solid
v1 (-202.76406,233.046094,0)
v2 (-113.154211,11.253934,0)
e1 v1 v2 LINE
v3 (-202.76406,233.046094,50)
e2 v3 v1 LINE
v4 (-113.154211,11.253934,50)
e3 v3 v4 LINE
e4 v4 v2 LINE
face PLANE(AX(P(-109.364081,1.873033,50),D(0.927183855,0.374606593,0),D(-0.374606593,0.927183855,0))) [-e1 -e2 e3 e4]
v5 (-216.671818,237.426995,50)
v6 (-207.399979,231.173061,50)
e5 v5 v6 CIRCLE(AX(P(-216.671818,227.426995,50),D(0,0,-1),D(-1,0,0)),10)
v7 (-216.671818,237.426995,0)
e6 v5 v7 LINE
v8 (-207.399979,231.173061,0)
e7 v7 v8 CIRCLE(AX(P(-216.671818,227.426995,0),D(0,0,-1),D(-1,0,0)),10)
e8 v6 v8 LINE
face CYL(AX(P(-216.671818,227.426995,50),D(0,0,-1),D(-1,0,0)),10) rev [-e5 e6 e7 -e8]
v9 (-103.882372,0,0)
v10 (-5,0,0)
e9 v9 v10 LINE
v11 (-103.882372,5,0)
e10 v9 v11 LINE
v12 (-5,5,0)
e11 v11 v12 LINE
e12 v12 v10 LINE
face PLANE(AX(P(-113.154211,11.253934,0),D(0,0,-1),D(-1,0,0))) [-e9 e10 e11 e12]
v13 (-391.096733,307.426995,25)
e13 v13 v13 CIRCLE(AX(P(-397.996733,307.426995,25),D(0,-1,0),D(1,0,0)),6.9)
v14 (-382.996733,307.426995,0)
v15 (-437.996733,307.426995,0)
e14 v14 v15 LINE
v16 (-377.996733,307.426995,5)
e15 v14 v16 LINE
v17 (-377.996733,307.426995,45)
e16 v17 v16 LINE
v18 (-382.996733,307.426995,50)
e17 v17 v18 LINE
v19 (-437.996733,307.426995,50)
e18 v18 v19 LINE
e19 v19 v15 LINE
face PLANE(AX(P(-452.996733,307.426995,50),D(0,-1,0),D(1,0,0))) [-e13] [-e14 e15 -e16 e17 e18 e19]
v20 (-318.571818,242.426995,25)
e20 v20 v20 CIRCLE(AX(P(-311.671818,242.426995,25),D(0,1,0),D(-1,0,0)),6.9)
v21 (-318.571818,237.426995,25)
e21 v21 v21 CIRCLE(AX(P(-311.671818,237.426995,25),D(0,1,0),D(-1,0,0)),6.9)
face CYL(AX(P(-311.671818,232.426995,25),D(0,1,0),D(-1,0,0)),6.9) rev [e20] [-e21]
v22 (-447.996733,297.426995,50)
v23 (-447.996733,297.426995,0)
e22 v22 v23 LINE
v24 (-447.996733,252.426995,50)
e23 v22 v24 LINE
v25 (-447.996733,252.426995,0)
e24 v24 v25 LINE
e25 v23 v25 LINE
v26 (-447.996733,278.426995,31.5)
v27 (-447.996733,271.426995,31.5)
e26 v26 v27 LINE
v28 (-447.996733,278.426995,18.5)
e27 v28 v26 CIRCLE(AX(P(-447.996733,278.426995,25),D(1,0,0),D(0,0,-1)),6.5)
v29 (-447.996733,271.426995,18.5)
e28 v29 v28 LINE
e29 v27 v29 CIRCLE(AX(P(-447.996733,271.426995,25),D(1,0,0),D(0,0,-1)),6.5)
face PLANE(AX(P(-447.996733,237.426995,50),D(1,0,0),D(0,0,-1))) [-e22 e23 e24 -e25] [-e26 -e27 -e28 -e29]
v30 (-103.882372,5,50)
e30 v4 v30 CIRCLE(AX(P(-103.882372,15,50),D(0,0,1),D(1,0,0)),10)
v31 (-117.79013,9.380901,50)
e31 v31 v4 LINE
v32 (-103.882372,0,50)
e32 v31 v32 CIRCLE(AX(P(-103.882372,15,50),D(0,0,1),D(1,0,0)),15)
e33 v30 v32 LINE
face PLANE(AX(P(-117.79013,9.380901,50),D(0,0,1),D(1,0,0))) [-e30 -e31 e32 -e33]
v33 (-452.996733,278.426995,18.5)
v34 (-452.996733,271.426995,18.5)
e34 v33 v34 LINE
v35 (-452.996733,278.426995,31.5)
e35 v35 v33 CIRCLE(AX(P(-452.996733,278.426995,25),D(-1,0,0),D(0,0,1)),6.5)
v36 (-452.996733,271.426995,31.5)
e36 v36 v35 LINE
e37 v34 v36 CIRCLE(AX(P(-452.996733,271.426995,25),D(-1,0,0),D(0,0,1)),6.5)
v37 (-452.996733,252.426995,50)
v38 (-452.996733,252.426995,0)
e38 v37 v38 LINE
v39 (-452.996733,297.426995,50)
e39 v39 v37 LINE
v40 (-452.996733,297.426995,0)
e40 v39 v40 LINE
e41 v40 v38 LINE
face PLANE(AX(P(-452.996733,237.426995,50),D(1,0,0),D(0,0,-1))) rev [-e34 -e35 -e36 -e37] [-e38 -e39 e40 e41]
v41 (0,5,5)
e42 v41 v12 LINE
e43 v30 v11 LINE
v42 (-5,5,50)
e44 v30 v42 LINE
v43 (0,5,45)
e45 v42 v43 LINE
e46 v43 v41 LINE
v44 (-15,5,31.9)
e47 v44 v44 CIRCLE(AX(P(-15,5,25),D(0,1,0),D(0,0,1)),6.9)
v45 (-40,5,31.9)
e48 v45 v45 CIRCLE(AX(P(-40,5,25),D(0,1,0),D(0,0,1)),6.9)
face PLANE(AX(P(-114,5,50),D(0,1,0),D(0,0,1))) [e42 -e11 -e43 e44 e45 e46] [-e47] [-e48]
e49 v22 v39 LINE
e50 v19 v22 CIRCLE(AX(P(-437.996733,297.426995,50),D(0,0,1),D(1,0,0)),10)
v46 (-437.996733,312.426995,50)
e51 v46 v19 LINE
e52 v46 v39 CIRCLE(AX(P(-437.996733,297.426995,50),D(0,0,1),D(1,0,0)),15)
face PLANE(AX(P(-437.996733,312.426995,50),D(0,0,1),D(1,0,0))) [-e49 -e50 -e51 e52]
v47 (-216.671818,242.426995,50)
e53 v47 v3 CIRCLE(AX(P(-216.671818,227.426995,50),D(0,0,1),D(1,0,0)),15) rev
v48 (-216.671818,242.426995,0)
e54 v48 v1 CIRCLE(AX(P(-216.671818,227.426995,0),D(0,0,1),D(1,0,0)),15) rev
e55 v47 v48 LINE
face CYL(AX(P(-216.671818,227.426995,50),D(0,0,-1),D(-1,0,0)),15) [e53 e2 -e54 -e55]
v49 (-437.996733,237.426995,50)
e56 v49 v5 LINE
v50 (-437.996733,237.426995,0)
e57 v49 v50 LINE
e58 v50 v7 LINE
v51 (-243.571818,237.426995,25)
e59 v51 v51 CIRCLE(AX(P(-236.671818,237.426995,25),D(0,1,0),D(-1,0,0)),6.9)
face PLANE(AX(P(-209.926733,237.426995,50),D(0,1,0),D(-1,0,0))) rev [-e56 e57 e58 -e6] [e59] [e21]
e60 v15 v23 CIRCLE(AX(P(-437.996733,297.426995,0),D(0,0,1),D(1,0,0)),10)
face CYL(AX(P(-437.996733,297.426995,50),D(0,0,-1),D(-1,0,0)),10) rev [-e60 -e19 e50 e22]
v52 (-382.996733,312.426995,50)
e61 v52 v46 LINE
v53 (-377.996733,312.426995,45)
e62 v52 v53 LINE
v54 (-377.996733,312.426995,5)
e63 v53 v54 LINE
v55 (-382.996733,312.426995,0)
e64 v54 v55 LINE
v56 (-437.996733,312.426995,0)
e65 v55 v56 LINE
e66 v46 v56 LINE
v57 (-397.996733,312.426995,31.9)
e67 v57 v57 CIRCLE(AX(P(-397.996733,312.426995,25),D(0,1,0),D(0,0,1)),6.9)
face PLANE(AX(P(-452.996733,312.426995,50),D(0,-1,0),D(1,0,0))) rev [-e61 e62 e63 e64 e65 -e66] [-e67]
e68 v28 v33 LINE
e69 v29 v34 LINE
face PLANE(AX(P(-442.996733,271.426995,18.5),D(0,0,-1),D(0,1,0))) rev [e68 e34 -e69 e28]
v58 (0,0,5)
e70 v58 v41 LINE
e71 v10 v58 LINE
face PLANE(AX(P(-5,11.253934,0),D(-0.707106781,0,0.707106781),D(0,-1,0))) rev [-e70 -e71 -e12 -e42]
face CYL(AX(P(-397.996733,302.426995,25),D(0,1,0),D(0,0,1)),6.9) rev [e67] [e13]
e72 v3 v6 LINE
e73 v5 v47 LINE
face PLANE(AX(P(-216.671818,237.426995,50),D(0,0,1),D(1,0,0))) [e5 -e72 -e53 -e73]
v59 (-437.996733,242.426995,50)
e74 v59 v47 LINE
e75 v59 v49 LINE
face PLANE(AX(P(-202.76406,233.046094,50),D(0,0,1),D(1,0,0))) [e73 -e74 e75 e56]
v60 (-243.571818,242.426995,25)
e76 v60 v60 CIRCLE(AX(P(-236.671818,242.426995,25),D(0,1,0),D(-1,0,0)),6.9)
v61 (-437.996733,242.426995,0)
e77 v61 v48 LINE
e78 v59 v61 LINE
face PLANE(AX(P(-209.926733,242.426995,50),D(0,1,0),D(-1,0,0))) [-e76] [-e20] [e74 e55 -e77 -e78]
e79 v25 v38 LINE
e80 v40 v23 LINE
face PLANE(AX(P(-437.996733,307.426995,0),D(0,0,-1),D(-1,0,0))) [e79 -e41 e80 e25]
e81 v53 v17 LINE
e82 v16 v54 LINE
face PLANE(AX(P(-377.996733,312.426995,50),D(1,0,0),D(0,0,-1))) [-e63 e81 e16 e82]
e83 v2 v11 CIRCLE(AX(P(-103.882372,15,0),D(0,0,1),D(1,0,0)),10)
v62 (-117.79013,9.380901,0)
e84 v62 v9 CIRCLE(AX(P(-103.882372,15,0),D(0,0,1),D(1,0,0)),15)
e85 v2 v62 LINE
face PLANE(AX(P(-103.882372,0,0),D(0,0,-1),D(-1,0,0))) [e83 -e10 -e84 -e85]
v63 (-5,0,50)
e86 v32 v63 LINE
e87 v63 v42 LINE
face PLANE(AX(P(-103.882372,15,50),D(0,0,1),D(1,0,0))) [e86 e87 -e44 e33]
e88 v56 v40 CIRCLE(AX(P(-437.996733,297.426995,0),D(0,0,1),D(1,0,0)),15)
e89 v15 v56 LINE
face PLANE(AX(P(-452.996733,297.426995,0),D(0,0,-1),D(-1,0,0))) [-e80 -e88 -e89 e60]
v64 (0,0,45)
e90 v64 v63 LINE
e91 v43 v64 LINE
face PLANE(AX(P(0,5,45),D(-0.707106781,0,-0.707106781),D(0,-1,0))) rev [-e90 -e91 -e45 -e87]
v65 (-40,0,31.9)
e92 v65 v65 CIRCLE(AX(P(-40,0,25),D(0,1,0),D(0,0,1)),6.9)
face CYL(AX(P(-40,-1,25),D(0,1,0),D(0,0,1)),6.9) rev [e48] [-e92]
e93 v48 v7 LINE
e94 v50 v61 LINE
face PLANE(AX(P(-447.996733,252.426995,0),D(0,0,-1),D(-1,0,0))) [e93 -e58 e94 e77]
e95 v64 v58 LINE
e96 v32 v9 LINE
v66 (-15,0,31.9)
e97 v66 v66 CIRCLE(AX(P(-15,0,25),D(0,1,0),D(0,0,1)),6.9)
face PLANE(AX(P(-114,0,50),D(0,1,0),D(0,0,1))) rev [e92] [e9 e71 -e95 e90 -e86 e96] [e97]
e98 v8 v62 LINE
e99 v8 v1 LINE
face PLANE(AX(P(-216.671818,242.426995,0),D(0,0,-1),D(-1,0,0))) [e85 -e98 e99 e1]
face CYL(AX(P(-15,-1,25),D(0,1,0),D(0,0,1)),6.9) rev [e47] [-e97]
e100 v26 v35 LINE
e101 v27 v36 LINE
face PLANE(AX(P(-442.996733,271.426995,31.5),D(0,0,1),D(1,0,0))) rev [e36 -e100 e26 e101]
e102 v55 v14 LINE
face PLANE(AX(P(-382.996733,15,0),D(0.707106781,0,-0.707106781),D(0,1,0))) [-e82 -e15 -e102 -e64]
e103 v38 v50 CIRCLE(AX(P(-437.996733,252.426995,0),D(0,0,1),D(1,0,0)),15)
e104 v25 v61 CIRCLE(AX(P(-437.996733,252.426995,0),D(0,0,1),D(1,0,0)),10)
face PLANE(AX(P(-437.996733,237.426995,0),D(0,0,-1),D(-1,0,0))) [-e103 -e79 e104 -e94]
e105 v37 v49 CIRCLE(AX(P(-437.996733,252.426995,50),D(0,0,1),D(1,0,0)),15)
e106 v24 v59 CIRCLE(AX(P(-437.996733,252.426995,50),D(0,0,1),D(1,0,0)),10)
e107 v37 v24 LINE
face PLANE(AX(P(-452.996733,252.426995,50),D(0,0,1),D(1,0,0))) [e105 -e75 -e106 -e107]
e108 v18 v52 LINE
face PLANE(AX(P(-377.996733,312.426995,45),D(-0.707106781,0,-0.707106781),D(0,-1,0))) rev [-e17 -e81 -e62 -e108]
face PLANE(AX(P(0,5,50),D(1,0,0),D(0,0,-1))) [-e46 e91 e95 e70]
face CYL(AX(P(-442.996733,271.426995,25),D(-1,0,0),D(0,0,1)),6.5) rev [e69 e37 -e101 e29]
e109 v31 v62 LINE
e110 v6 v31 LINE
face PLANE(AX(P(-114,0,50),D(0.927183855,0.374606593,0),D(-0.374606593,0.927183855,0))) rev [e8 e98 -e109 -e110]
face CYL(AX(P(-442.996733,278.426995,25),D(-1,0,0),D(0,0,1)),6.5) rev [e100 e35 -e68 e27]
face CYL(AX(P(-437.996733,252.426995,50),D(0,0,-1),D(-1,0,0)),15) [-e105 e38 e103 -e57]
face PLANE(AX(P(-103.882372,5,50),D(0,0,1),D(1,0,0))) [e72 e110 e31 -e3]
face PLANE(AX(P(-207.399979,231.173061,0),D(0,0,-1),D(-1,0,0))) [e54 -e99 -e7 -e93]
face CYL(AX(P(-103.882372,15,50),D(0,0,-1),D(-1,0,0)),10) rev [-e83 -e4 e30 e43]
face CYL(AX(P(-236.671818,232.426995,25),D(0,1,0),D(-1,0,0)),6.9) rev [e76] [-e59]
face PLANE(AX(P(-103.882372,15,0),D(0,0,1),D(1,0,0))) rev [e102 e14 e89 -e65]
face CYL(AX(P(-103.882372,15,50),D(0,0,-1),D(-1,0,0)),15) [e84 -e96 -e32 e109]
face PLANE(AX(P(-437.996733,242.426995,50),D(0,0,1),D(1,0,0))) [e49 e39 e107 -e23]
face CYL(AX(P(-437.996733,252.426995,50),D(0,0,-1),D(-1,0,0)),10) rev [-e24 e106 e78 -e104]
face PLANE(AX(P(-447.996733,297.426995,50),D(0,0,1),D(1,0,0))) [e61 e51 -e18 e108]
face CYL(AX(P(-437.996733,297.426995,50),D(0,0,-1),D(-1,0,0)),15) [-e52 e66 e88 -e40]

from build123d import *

# Parameters (mm, degrees)
SM_BASE_FLANGE_1_DEPTH = 50
SKETCH_3_R             = 6.9
CUT_EXTRUDE_2_DEPTH    = 10
OTHER_1_DEPTH          = 5
OTHER_START            = 307.42699492
OTHER_1_2_DEPTH        = 5
CUT_EXTRUDE_3_DEPTH    = 10
SKETCH_5_R             = 6.9
CUT_EXTRUDE_4_DEPTH    = 10
SKETCH_6_R             = 6.9
CUT_EXTRUDE_5_DEPTH    = 10


# Read off the part's stored shape, not the designer's step: Затупленный угол1
# Sheet-metal steps are written as plain solids
with BuildPart() as part:
    # Sketch 1 → Базовая кромка1 (new body)
    with BuildSketch(Plane.XY):
        with BuildLine():
            Line((-377.996732669, 312.42699492), (-437.996732669, 312.42699492))
            ThreePointArc((-437.996732669, 312.42699492), (-448.603334387, 308.033596638), (-452.996732669, 297.42699492))
            Line((-452.996732669, 297.42699492), (-452.996732669, 252.42699492))
            ThreePointArc((-452.996732669, 252.42699492), (-448.603334387, 241.820393202), (-437.996732669, 237.42699492))
            Line((-437.996732669, 237.42699492), (-216.671817837, 237.42699492))
            ThreePointArc((-216.671817837, 237.42699492), (-211.079888803, 235.717370646), (-207.399979292, 231.173060854))
            Line((-207.399979292, 231.173060854), (-117.790130066, 9.380901099))
            ThreePointArc((-117.790130066, 9.380901099), (-112.270265799, 2.564436412), (-103.882372247, 0))
            Line((-103.882372247, 0), (0, 0))
            Line((0, 0), (0, 5))
            Line((0, 5), (-103.882372247, 5))
            ThreePointArc((-103.882372247, 5), (-109.474301282, 6.709624274), (-113.154210793, 11.253934066))
            Line((-113.154210793, 11.253934066), (-202.764060019, 233.046093821))
            ThreePointArc((-202.764060019, 233.046093821), (-208.283924285, 239.862558508), (-216.671817837, 242.42699492))
            Line((-216.671817837, 242.42699492), (-437.996732669, 242.42699492))
            ThreePointArc((-437.996732669, 242.42699492), (-445.067800481, 245.355927108), (-447.996732669, 252.42699492))
            Line((-447.996732669, 252.42699492), (-447.996732669, 297.42699492))
            ThreePointArc((-447.996732669, 297.42699492), (-445.067800481, 304.498062732), (-437.996732669, 307.42699492))
            Line((-437.996732669, 307.42699492), (-377.996732669, 307.42699492))
            Line((-377.996732669, 307.42699492), (-377.996732669, 312.42699492))
        make_face()
    extrude(amount=SM_BASE_FLANGE_1_DEPTH)

    # Эскиз3 → Вырез-Вытянуть2 (cut)
    with BuildSketch(Plane(origin=(0, 5, 0), x_dir=(1, 0, 0), z_dir=(0, 1, 0))):
        with Locations(Location((-15, -25, 0), (0, 0, 270))):
            Circle(SKETCH_3_R)
        with Locations(Location((-40, -25, 0), (0, 0, 270))):
            Circle(SKETCH_3_R)
    extrude(amount=-CUT_EXTRUDE_2_DEPTH, mode=Mode.SUBTRACT)

    # Other 1 outline → Other 1 (cut)
    with BuildSketch(Plane(origin=(0, 0, 0), x_dir=(1, 0, 0), z_dir=(0, 1, 0))):
        Polygon((0, 0), (-5, 0), (0, -5), align=None)
        Polygon((0, -50), (0, -45), (-5, -50), align=None)
    extrude(amount=OTHER_1_DEPTH, mode=Mode.SUBTRACT)

    # Other 1 2 outline → Other 1 2 (cut)
    with BuildSketch(Plane(origin=(0, 0, 0), x_dir=(1, 0, 0), z_dir=(0, 1, 0)).offset(OTHER_START)):
        Polygon((-377.996732669, -50), (-377.996732669, -45), (-382.996732669, -50), align=None)
        Polygon((-382.996732669, 0), (-377.996732669, -5), (-377.996732669, 0), align=None)
    extrude(amount=OTHER_1_2_DEPTH, mode=Mode.SUBTRACT)

    # Эскиз4 → Вырез-Вытянуть3 (cut)
    with BuildSketch(Plane.ZY.offset(452.996732669)):
        with BuildLine():
            Line((18.5, 271.42699492), (18.5, 278.42699492))
            ThreePointArc((18.5, 278.42699492), (25, 284.92699492), (31.5, 278.42699492))
            Line((31.5, 278.42699492), (31.5, 271.42699492))
            ThreePointArc((31.5, 271.42699492), (25, 264.92699492), (18.5, 271.42699492))
        make_face()
    extrude(amount=-CUT_EXTRUDE_3_DEPTH, mode=Mode.SUBTRACT)

    # Эскиз5 → Вырез-Вытянуть4 (cut)
    with BuildSketch(Plane(origin=(0, 312.42699492, 0), x_dir=(1, 0, 0), z_dir=(0, 1, 0))):
        with Locations(Location((-397.996732669, -25, 0), (0, 0, 270))):
            Circle(SKETCH_5_R)
    extrude(amount=-CUT_EXTRUDE_4_DEPTH, mode=Mode.SUBTRACT)

    # Эскиз6 → Вырез-Вытянуть5 (cut)
    with BuildSketch(Plane(origin=(0, 242.42699492, 0), x_dir=(1, 0, 0), z_dir=(0, 1, 0))):
        with Locations(Location((-311.671817837, -25, 0), (0, 0, 180))):
            Circle(SKETCH_6_R)
        with Locations(Location((-236.671817837, -25, 0), (0, 0, 180))):
            Circle(SKETCH_6_R)
    extrude(amount=-CUT_EXTRUDE_5_DEPTH, mode=Mode.SUBTRACT)


solid = part.part
